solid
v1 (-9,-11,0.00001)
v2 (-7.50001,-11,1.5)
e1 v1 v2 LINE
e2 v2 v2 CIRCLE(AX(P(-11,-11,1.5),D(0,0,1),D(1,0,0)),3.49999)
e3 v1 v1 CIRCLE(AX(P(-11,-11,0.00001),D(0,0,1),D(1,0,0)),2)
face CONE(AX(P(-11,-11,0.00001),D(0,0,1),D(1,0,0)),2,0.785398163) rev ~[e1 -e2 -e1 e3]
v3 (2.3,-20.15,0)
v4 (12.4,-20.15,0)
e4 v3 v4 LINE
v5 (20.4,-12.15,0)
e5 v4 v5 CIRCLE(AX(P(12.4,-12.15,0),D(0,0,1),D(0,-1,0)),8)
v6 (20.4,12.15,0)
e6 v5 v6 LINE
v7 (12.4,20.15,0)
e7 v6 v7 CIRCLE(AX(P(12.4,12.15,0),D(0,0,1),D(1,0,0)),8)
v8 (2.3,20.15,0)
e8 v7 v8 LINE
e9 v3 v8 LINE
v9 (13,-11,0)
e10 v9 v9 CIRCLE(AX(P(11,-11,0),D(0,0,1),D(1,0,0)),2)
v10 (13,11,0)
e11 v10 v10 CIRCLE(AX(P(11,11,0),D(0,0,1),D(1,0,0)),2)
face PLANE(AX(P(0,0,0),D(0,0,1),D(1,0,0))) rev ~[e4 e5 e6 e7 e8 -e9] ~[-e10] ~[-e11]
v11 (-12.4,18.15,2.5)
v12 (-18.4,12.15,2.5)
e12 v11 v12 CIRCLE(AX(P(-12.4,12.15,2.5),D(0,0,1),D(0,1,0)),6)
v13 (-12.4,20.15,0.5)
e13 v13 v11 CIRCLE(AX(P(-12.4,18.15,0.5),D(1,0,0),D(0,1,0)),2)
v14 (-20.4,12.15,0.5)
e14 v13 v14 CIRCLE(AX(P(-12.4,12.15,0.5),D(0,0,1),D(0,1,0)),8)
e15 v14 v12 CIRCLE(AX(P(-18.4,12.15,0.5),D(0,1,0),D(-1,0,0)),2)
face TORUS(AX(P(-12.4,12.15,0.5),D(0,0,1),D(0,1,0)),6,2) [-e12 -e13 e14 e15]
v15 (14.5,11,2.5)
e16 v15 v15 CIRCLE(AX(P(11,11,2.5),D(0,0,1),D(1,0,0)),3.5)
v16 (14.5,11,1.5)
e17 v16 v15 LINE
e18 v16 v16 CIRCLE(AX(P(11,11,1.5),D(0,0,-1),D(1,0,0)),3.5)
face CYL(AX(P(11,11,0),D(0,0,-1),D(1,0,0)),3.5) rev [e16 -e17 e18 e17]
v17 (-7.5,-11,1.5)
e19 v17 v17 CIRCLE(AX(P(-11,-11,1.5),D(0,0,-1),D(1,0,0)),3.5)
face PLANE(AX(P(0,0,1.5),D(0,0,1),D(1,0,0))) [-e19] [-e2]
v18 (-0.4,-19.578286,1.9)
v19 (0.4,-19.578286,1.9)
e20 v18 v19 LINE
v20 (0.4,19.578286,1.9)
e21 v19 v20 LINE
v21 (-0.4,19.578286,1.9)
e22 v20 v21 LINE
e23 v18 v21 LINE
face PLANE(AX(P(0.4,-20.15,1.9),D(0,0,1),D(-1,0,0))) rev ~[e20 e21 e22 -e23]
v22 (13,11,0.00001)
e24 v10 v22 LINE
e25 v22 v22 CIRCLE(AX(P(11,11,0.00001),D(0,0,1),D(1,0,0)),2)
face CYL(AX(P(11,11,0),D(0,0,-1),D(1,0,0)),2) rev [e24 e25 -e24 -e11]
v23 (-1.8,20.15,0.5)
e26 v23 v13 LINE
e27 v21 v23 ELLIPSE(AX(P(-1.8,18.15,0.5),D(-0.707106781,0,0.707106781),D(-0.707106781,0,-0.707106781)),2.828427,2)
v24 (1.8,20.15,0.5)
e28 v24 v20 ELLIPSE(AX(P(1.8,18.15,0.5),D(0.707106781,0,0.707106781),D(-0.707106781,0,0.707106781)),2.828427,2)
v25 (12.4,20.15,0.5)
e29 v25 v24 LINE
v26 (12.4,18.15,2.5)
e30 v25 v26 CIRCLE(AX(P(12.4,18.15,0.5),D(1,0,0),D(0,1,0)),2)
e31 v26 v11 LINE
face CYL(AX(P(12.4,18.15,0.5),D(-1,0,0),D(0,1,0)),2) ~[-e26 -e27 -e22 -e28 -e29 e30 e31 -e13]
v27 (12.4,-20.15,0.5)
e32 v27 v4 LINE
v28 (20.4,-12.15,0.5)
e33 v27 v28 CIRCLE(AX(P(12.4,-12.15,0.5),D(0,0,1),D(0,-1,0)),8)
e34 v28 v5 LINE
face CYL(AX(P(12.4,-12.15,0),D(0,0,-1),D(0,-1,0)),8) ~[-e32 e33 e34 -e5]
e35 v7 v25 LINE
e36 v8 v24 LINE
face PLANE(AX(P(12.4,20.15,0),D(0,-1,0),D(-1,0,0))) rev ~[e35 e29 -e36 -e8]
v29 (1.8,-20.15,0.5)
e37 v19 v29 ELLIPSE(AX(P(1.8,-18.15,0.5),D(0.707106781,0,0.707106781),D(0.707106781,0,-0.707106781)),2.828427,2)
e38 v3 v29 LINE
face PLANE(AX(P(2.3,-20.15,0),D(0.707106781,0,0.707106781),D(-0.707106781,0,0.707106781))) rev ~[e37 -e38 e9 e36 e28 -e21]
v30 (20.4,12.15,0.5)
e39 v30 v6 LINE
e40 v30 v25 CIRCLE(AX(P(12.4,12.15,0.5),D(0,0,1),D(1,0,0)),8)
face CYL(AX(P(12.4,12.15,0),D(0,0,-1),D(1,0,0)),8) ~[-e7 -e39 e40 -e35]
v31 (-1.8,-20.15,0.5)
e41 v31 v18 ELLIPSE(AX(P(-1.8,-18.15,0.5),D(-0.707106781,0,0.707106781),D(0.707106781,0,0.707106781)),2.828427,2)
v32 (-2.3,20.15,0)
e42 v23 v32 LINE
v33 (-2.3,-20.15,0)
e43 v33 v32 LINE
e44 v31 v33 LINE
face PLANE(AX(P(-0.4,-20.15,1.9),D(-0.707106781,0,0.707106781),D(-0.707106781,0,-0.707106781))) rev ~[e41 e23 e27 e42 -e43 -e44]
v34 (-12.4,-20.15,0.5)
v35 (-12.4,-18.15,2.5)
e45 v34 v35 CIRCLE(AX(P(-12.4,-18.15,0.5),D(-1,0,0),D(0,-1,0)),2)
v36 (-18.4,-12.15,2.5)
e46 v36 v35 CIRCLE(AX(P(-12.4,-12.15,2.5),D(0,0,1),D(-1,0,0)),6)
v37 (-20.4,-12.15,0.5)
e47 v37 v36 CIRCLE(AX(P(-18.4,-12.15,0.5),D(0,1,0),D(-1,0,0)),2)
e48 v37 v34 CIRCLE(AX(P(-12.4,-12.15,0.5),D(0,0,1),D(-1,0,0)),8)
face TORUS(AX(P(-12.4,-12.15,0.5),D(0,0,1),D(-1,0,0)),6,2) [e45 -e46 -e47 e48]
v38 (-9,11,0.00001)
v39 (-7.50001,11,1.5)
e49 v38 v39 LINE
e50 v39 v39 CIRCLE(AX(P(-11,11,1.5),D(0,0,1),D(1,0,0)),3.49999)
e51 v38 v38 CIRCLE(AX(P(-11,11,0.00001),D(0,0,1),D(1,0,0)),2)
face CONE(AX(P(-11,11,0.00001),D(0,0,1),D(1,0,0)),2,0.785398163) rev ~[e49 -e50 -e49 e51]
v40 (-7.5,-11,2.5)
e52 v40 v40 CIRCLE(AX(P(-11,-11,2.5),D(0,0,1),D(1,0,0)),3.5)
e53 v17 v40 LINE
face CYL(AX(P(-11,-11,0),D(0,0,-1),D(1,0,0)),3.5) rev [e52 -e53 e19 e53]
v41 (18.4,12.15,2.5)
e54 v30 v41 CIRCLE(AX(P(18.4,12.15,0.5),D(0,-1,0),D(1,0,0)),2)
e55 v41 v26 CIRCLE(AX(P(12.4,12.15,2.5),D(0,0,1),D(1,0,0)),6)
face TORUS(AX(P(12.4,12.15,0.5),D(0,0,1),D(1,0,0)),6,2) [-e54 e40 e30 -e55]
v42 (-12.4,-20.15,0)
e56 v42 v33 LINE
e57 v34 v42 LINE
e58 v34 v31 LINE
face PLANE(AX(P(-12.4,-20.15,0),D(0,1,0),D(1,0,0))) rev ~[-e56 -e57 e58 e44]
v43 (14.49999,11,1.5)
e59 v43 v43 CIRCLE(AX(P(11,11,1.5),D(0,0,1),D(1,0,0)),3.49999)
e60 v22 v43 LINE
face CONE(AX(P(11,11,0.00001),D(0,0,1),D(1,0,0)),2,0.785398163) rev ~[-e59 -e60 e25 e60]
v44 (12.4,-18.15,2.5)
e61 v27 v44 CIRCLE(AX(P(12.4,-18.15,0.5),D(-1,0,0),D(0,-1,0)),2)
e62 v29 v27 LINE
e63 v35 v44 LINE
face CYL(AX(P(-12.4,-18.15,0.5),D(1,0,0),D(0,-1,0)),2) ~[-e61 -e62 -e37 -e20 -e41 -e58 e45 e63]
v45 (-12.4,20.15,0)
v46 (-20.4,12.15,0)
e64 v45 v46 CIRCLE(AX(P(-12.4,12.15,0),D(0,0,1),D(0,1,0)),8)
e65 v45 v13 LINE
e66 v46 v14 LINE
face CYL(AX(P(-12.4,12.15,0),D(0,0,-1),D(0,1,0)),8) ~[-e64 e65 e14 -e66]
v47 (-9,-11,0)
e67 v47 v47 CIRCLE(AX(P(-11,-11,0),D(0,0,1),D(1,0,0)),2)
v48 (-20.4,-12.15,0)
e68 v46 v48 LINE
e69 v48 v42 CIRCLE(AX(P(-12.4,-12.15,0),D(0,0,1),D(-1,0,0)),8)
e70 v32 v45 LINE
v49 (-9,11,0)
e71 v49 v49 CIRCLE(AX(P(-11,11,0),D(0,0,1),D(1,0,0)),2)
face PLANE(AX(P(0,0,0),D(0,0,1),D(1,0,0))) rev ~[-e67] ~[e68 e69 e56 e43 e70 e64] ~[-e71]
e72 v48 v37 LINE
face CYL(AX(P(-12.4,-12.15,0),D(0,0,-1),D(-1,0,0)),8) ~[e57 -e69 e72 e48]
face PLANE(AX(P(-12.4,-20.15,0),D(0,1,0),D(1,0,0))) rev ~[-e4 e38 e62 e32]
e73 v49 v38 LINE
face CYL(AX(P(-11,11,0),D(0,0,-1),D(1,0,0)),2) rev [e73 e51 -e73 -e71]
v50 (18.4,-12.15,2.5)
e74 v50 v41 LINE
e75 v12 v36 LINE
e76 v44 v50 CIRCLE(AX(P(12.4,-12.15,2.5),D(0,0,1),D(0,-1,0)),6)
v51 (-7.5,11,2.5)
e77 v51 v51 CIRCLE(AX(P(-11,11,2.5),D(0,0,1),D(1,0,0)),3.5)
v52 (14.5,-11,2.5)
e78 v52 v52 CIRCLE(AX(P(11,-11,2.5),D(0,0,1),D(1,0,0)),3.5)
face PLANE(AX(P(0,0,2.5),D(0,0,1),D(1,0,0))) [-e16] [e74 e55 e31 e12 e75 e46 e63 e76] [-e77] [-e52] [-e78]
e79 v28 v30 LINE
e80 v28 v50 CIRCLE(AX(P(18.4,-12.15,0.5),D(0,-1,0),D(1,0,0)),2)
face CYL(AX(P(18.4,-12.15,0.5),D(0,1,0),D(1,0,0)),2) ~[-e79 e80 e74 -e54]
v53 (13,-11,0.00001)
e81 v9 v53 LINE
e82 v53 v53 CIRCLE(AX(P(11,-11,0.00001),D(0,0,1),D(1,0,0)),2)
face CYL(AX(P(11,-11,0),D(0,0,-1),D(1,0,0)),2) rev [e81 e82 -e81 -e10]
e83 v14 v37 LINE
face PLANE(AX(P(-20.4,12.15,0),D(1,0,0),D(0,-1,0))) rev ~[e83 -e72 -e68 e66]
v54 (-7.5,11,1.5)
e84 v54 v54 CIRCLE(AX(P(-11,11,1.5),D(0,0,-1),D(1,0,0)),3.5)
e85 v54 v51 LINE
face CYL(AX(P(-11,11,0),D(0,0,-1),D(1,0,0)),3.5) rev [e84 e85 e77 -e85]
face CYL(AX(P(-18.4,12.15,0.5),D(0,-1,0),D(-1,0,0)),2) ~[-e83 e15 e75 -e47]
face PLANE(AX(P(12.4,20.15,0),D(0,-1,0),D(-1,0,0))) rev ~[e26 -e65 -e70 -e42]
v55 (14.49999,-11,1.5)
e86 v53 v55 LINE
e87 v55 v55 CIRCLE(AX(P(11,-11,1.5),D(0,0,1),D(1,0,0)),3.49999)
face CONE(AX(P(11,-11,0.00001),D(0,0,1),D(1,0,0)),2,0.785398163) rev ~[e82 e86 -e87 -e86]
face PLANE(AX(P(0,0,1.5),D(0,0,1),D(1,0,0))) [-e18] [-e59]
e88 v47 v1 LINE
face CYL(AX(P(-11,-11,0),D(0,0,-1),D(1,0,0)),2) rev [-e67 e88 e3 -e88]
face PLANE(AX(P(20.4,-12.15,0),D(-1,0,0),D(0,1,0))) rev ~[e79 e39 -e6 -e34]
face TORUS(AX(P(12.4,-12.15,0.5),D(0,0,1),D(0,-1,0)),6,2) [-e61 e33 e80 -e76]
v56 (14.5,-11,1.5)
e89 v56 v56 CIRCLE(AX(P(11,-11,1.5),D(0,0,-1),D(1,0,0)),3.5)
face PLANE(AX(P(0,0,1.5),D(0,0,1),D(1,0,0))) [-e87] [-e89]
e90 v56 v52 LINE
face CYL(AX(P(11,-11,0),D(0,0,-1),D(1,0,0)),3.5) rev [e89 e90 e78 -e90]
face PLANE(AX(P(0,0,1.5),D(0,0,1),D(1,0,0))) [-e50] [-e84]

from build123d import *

# Parameters (mm, degrees)
F0_R     = 3.5
F0_R_2   = 2
F1_DEPTH = 1.5
F2_DEPTH = 2.5
F3_R     = 2
F4_SIZE  = 1.49999
F7_DEPTH = 40.301


# Not quite as in the source:
# - a fillet or chamfer is up to 0.001 mm smaller than in the source, because OpenCascade refuses the exact size


with BuildPart() as f1:
    # F0 (on Top) → F1 (new body)
    with BuildSketch(Plane.XY):
        with BuildLine():
            ThreePointArc((20.4, 12.15), (18.0568542495, 17.8068542495), (12.4, 20.15))
            Line((12.4, 20.15), (-12.4, 20.15))
            ThreePointArc((-12.4, 20.15), (-18.0568542495, 17.8068542495), (-20.4, 12.15))
            Line((-20.4, 12.15), (-20.4, -12.15))
            ThreePointArc((-20.4, -12.15), (-18.0568542495, -17.8068542495), (-12.4, -20.15))
            Line((-12.4, -20.15), (12.4, -20.15))
            ThreePointArc((12.4, -20.15), (18.0568542495, -17.8068542495), (20.4, -12.15))
            Line((20.4, -12.15), (20.4, 12.15))
        make_face()
        with Locations((-11, -11)):
            Circle(F0_R, mode=Mode.SUBTRACT)
        with Locations((11, -11)):
            Circle(F0_R, mode=Mode.SUBTRACT)
        with Locations((-11, 11)):
            Circle(F0_R, mode=Mode.SUBTRACT)
        with Locations((11, 11)):
            Circle(F0_R, mode=Mode.SUBTRACT)
        with Locations((-11, 11)):
            Circle(F0_R)
        with Locations((-11, 11)):
            Circle(F0_R_2, mode=Mode.SUBTRACT)
        with Locations((11, 11)):
            Circle(F0_R)
        with Locations((11, 11)):
            Circle(F0_R_2, mode=Mode.SUBTRACT)
        with Locations((11, -11)):
            Circle(F0_R)
        with Locations((11, -11)):
            Circle(F0_R_2, mode=Mode.SUBTRACT)
        with Locations((-11, -11)):
            Circle(F0_R)
        with Locations((-11, -11)):
            Circle(F0_R_2, mode=Mode.SUBTRACT)
    extrude(amount=F1_DEPTH)

    # F0 (on Top) → F2 (join)
    with BuildSketch(Plane.XY):
        with BuildLine():
            ThreePointArc((20.4, 12.15), (18.0568542495, 17.8068542495), (12.4, 20.15))
            Line((12.4, 20.15), (-12.4, 20.15))
            ThreePointArc((-12.4, 20.15), (-18.0568542495, 17.8068542495), (-20.4, 12.15))
            Line((-20.4, 12.15), (-20.4, -12.15))
            ThreePointArc((-20.4, -12.15), (-18.0568542495, -17.8068542495), (-12.4, -20.15))
            Line((-12.4, -20.15), (12.4, -20.15))
            ThreePointArc((12.4, -20.15), (18.0568542495, -17.8068542495), (20.4, -12.15))
            Line((20.4, -12.15), (20.4, 12.15))
        make_face()
        with Locations((-11, -11)):
            Circle(F0_R, mode=Mode.SUBTRACT)
        with Locations((11, -11)):
            Circle(F0_R, mode=Mode.SUBTRACT)
        with Locations((-11, 11)):
            Circle(F0_R, mode=Mode.SUBTRACT)
        with Locations((11, 11)):
            Circle(F0_R, mode=Mode.SUBTRACT)
    extrude(amount=F2_DEPTH)

    # F3
    f3_edges = [f1.edges().sort_by_distance(p)[0] for p in [
        (-18.056854, 17.806854, 2.5),
    ]]
    fillet(f3_edges, radius=F3_R)

    # F4 (size 1.5 in the source; OpenCascade refuses exactly that, so slightly less here)
    f4_edges = [f1.edges().sort_by_distance(p)[0] for p in [
        (-13, 11, 1.5),
        (9, 11, 1.5),
        (9, -11, 1.5),
        (-13, -11, 1.5),
    ]]
    chamfer(f4_edges, length=F4_SIZE)

    # F6 (on offset) → F7 (cut, through all)
    with BuildSketch(Plane.XZ.offset(20.15)):
        Polygon((-0.4, 1.9), (-2.3, 0), (2.3, 0), (0.4, 1.9), align=None)
    extrude(amount=-F7_DEPTH, mode=Mode.SUBTRACT)


solid = f1.part
